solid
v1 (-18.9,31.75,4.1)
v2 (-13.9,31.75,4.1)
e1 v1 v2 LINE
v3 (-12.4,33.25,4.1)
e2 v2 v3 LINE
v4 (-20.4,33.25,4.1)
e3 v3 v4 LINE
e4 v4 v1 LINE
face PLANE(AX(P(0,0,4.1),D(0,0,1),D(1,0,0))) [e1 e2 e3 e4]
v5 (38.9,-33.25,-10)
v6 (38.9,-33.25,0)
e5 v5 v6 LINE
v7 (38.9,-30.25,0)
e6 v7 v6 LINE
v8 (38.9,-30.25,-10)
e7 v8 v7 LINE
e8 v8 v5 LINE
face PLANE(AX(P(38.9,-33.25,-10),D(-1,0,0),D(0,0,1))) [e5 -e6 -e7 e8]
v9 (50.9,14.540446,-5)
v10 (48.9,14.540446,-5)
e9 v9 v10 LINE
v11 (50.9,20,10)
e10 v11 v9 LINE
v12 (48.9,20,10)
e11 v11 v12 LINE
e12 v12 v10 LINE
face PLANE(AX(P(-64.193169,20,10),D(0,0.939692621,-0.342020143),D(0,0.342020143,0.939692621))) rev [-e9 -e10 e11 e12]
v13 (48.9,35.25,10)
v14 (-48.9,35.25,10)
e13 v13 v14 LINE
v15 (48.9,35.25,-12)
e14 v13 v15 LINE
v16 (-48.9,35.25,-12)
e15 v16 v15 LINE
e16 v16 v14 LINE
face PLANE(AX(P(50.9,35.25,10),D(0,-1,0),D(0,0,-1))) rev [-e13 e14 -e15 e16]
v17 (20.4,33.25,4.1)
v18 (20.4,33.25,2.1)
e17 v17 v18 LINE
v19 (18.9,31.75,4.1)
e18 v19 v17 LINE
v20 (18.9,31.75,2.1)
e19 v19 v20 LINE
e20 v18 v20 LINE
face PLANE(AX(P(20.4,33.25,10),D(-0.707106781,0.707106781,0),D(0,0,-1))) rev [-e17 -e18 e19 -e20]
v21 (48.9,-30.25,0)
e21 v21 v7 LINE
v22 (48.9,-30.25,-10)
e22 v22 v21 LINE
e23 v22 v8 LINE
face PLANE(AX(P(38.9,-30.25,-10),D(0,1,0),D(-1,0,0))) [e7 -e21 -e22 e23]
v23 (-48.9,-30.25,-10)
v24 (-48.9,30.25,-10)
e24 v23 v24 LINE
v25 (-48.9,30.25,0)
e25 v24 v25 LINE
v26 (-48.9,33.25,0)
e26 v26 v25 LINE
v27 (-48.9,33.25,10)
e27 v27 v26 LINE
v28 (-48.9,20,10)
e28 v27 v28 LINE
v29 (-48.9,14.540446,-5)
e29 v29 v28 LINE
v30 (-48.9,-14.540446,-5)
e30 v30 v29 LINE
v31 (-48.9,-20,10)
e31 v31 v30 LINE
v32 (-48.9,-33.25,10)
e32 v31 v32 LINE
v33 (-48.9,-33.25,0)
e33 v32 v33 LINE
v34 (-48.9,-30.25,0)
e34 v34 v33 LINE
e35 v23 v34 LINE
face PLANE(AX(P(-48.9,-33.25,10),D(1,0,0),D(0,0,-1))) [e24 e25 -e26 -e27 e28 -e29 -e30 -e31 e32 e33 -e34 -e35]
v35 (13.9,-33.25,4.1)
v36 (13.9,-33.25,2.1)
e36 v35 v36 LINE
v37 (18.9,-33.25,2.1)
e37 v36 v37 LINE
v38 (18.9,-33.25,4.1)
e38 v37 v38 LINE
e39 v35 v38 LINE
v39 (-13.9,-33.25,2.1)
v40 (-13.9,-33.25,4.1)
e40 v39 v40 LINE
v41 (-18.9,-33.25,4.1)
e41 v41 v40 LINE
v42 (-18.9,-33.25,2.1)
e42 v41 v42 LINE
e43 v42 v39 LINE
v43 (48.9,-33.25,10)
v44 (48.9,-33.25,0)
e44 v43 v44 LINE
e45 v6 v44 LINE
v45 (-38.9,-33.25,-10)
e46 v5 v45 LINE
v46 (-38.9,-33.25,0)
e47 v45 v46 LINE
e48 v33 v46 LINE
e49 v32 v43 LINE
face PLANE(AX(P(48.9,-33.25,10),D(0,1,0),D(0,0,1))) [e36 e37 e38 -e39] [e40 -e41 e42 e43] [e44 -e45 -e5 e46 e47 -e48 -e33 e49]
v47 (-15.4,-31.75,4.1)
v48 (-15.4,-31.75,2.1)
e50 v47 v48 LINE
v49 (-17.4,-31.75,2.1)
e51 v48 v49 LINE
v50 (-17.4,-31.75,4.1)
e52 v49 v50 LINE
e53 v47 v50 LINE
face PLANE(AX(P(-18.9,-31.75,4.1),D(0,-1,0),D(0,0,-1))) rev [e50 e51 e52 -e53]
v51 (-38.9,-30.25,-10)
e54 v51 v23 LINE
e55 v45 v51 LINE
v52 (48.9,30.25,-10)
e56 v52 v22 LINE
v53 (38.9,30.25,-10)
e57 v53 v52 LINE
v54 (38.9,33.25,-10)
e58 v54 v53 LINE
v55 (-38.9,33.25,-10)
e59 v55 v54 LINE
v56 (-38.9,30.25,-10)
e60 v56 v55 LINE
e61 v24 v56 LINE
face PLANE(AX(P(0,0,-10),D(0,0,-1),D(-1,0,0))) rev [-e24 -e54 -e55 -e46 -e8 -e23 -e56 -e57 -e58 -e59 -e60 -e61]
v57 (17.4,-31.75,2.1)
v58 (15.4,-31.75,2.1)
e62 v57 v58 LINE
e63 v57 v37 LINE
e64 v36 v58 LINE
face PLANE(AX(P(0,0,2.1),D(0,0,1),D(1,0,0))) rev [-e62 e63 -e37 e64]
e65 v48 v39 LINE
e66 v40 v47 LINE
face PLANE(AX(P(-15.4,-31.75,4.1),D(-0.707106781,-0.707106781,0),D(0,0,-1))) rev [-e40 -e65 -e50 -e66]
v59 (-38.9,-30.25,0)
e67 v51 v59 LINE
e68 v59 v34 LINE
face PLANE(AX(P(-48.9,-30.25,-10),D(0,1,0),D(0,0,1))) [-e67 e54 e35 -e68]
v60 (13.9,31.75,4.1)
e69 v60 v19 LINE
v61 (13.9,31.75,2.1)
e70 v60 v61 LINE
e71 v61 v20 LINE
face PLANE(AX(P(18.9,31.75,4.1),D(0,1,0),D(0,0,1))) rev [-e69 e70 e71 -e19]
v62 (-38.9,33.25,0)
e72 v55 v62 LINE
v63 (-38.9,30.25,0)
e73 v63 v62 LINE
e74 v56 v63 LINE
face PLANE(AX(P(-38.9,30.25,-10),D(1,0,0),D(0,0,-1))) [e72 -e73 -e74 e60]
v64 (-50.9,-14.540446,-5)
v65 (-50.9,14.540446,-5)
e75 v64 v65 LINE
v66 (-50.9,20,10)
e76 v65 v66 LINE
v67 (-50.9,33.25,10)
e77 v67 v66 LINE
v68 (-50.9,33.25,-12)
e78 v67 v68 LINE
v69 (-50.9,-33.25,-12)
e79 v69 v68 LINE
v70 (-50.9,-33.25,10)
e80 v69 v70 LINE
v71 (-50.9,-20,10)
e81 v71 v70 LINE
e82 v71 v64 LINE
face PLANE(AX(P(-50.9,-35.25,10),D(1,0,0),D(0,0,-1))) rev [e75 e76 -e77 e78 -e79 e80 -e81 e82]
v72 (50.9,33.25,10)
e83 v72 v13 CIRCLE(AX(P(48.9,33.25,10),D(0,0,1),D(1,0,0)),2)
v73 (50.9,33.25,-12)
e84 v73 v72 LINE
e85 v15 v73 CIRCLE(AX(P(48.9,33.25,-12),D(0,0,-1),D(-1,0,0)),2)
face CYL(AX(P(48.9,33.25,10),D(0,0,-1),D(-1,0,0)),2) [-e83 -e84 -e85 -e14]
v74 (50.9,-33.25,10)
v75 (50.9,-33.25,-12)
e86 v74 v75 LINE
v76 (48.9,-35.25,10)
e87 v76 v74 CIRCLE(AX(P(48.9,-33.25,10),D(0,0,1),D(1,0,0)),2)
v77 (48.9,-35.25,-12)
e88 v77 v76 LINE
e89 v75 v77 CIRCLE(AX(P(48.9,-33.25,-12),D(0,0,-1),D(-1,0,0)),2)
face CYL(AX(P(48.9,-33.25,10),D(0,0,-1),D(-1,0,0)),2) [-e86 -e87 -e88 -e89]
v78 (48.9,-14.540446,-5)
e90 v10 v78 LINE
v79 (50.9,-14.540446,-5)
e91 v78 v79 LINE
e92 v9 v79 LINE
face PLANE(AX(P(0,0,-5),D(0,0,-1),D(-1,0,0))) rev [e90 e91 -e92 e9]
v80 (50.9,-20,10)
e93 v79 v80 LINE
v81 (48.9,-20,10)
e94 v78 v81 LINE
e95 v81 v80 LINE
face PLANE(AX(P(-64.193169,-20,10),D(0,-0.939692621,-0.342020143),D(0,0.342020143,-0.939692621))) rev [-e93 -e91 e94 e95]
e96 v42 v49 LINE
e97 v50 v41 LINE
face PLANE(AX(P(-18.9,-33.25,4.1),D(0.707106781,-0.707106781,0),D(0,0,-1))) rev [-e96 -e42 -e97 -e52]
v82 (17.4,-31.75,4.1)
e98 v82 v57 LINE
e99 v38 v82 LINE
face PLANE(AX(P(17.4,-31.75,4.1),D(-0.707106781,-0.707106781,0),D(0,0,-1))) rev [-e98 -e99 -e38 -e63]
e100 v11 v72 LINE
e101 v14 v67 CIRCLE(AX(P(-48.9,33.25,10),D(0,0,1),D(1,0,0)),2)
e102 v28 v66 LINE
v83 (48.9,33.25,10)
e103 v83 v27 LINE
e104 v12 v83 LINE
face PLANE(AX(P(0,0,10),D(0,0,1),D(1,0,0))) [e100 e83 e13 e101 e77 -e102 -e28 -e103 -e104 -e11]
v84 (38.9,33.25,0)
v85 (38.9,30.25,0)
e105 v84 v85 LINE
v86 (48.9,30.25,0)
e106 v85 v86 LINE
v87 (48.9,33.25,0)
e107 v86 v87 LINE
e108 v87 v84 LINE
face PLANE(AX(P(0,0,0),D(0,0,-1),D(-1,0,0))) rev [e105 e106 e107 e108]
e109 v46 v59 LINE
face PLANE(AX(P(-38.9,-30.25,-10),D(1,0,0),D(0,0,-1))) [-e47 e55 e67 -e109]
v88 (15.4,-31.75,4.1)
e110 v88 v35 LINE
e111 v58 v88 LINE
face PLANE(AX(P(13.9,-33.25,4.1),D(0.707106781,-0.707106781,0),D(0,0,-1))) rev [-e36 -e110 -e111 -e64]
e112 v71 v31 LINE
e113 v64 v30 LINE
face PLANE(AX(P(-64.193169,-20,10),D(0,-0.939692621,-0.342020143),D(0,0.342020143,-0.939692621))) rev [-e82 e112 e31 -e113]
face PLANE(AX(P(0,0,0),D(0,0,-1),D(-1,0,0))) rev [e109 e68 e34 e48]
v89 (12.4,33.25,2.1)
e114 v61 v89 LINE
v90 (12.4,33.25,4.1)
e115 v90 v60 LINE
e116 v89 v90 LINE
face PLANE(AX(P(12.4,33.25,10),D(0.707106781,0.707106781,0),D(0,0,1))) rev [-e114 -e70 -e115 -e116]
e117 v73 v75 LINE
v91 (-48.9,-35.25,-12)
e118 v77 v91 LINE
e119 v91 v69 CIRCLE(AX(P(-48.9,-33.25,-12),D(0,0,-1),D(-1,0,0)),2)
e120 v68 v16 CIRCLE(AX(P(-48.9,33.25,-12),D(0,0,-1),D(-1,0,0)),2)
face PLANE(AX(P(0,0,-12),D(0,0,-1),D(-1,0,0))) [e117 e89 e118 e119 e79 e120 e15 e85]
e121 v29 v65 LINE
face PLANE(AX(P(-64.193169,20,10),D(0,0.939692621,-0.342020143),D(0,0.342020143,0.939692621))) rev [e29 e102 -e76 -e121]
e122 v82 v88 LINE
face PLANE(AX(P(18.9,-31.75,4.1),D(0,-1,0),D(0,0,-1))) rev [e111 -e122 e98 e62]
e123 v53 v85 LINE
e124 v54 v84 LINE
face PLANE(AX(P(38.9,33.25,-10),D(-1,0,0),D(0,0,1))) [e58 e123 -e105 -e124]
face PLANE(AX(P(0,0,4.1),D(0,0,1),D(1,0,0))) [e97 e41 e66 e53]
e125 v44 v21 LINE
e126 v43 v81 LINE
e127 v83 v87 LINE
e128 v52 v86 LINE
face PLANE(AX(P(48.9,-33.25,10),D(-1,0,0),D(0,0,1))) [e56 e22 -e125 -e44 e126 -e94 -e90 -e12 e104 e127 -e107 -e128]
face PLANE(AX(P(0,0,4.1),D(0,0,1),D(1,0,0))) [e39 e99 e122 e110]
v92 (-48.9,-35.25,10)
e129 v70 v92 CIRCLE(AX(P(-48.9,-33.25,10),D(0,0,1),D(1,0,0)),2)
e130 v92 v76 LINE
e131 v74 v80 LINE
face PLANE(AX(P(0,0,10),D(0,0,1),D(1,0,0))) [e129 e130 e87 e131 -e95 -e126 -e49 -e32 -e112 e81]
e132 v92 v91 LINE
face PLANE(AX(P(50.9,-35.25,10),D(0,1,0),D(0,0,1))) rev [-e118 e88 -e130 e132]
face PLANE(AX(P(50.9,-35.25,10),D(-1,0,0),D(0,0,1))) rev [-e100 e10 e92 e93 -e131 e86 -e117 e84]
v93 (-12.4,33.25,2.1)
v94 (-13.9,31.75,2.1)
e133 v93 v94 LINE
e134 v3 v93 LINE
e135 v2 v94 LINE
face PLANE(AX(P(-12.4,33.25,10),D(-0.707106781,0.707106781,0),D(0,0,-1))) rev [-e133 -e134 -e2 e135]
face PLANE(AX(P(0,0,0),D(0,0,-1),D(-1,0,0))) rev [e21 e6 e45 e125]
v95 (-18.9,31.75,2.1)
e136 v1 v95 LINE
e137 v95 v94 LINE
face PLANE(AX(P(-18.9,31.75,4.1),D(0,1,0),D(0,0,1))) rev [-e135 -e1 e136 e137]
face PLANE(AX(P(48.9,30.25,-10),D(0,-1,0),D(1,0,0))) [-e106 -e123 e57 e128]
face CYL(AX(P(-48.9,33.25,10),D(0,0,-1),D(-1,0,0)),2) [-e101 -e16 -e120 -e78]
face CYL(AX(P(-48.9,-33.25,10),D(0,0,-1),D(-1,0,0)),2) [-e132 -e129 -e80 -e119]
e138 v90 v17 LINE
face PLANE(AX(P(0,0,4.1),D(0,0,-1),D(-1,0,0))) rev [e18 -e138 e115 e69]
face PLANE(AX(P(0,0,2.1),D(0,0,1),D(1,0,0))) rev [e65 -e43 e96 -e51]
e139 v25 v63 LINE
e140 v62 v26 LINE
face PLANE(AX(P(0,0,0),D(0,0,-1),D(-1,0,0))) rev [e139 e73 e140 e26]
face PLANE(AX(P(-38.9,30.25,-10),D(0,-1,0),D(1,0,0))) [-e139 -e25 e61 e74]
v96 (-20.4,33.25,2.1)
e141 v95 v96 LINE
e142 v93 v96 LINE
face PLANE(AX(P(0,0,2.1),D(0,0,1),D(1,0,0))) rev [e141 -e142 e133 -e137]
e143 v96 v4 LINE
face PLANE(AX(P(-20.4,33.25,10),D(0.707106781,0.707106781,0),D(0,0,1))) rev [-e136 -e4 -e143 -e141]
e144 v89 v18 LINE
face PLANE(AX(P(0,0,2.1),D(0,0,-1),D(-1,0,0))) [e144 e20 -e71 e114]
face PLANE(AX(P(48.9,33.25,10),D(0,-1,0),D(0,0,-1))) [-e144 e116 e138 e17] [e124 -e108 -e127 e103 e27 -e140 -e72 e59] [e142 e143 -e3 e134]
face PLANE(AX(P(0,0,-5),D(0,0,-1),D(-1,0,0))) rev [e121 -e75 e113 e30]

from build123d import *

# Parameters (mm, degrees)
SKETCH1_W                            = 70.5
SKETCH1_H                            = 101.8
SKETCH1_W_2                          = 66.5
SKETCH1_H_2                          = 97.8
BOSS_EXTRUDE1_BOARD_4MM_DEPTH        = 10
SKETCH2_W                            = 101.8
SKETCH2_H                            = 70.5
BOSS_EXTRUDE2_UNDER_10MS_DEPTH       = 10
SKETCH3_W                            = 101.8
SKETCH3_H                            = 70.5
BOSS_EXTRUDE3_BOTTOM_COVER_2MM_DEPTH = 2
SKETCH4_W                            = 5
SKETCH4_H                            = 3.5
BOSS_EXTRUDE4_DEPTH                  = 2
SKETCH5_W                            = 128.386338002
SKETCH5_H                            = 40
CUT_EXTRUDE1_CUT_USB_DEPTH           = 15
CUT_EXTRUDE1_CUT_USB_DRAFT           = -20
FILLET1_R                            = 2
CHAMFER2_START                       = 2.1
CHAMFER2_DEPTH                       = 2
CHAMFER2_2_DEPTH                     = 2


with BuildPart() as part:
    # Sketch1 → Boss-Extrude1-board-4mm (new body)
    with BuildSketch(Plane(origin=(0, 0, 0), x_dir=(0, 1, 0), z_dir=(0, 0, 1))):
        Rectangle(SKETCH1_W, SKETCH1_H)
        Rectangle(SKETCH1_W_2, SKETCH1_H_2, mode=Mode.SUBTRACT)
    extrude(amount=BOSS_EXTRUDE1_BOARD_4MM_DEPTH)

    # Sketch2 → Boss-Extrude2-under-10ms (add)
    with BuildSketch(Plane(origin=(0, 0, 0), x_dir=(1, 0, 0), z_dir=(0, 0, -1))):
        Rectangle(SKETCH2_W, SKETCH2_H)
        Polygon((-48.9, 30.25), (-38.9, 30.25), (-38.9, 33.25), (38.9, 33.25), (38.9, 30.25), (48.9, 30.25), (48.9, -30.25), (38.9, -30.25), (38.9, -33.25), (-38.9, -33.25), (-38.9, -30.25), (-48.9, -30.25), align=None, mode=Mode.SUBTRACT)
    extrude(amount=BOSS_EXTRUDE2_UNDER_10MS_DEPTH)

    # Sketch3 → Boss-Extrude3-bottom-cover-2mm (add)
    with BuildSketch(Plane(origin=(0, 0, -10), x_dir=(1, 0, 0), z_dir=(0, 0, -1))):
        Rectangle(SKETCH3_W, SKETCH3_H)
    extrude(amount=BOSS_EXTRUDE3_BOTTOM_COVER_2MM_DEPTH)

    # Sketch4 → Boss-Extrude4 (add)
    with BuildSketch(Plane.XY.offset(2.1)):
        with Locations((-16.4, 33.5)):
            Rectangle(SKETCH4_W, SKETCH4_H)
        with Locations((-16.4, -33.5)):
            Rectangle(SKETCH4_W, SKETCH4_H)
        with Locations((16.4, -33.5)):
            Rectangle(SKETCH4_W, SKETCH4_H)
        with Locations((16.4, 33.5)):
            Rectangle(SKETCH4_W, SKETCH4_H)
    extrude(amount=BOSS_EXTRUDE4_DEPTH)


with BuildPart() as cut_extrude1_cut_usb_tool:
    # Sketch5 → Cut-Extrude1-cut-usb (with draft: the straight prism first)
    with BuildSketch(Plane.XY.offset(10)):
        Rectangle(SKETCH5_W, SKETCH5_H)
    extrude(amount=-CUT_EXTRUDE1_CUT_USB_DEPTH)
    # Cut-Extrude1-cut-usb: the draft: its side faces are tilted about the plane it starts from
    cut_extrude1_cut_usb_sides = [cut_extrude1_cut_usb_tool.faces().sort_by_distance(p)[0] for p in [
        (0, -20, 2.5),
        (64.193169001, 0, 2.5),
        (0, 20, 2.5),
        (-64.193169001, 0, 2.5),
    ]]
    draft(cut_extrude1_cut_usb_sides, Plane.XY.offset(10), CUT_EXTRUDE1_CUT_USB_DRAFT)


with BuildPart() as part_1:
    add(part.part)

    # Cut-Extrude1-cut-usb: cut by cut_extrude1_cut_usb_tool
    add(cut_extrude1_cut_usb_tool.part, mode=Mode.SUBTRACT)

    # Fillet1
    fillet1_edges = [part_1.edges().sort_by_distance(p)[0] for p in [
        (50.9, -35.25, -1),
        (-50.9, -35.25, -1),
        (-50.9, 35.25, -1),
        (50.9, 35.25, -1),
    ]]
    fillet(fillet1_edges, radius=FILLET1_R)

    # Chamfer2: read off the stored shape, not the designer's step
    # Chamfer2 outline → Chamfer2 (cut)
    with BuildSketch(Plane.XY.offset(CHAMFER2_START)):
        Polygon((-18.9, -31.75), (-18.9, -33.25), (-17.4, -31.75), align=None)
        Polygon((-13.9, -31.75), (-15.4, -31.75), (-13.9, -33.25), align=None)
        Polygon((13.9, -31.75), (13.9, -33.25), (15.4, -31.75), align=None)
        Polygon((18.9, -31.75), (17.4, -31.75), (18.9, -33.25), align=None)
    extrude(amount=CHAMFER2_DEPTH, mode=Mode.SUBTRACT)

    # Chamfer2 2 outline → Chamfer2 2 (add)
    with BuildSketch(Plane.XY.offset(CHAMFER2_START)):
        Polygon((-18.9, 31.75), (-18.9, 33.25), (-20.4, 33.25), align=None)
        Polygon((-13.9, 31.75), (-12.4, 33.25), (-13.9, 33.25), align=None)
        Polygon((20.4, 33.25), (18.9, 33.25), (18.9, 31.75), align=None)
        Polygon((12.4, 33.25), (13.9, 31.75), (13.9, 33.25), align=None)
    extrude(amount=CHAMFER2_2_DEPTH)


solid = part_1.part
